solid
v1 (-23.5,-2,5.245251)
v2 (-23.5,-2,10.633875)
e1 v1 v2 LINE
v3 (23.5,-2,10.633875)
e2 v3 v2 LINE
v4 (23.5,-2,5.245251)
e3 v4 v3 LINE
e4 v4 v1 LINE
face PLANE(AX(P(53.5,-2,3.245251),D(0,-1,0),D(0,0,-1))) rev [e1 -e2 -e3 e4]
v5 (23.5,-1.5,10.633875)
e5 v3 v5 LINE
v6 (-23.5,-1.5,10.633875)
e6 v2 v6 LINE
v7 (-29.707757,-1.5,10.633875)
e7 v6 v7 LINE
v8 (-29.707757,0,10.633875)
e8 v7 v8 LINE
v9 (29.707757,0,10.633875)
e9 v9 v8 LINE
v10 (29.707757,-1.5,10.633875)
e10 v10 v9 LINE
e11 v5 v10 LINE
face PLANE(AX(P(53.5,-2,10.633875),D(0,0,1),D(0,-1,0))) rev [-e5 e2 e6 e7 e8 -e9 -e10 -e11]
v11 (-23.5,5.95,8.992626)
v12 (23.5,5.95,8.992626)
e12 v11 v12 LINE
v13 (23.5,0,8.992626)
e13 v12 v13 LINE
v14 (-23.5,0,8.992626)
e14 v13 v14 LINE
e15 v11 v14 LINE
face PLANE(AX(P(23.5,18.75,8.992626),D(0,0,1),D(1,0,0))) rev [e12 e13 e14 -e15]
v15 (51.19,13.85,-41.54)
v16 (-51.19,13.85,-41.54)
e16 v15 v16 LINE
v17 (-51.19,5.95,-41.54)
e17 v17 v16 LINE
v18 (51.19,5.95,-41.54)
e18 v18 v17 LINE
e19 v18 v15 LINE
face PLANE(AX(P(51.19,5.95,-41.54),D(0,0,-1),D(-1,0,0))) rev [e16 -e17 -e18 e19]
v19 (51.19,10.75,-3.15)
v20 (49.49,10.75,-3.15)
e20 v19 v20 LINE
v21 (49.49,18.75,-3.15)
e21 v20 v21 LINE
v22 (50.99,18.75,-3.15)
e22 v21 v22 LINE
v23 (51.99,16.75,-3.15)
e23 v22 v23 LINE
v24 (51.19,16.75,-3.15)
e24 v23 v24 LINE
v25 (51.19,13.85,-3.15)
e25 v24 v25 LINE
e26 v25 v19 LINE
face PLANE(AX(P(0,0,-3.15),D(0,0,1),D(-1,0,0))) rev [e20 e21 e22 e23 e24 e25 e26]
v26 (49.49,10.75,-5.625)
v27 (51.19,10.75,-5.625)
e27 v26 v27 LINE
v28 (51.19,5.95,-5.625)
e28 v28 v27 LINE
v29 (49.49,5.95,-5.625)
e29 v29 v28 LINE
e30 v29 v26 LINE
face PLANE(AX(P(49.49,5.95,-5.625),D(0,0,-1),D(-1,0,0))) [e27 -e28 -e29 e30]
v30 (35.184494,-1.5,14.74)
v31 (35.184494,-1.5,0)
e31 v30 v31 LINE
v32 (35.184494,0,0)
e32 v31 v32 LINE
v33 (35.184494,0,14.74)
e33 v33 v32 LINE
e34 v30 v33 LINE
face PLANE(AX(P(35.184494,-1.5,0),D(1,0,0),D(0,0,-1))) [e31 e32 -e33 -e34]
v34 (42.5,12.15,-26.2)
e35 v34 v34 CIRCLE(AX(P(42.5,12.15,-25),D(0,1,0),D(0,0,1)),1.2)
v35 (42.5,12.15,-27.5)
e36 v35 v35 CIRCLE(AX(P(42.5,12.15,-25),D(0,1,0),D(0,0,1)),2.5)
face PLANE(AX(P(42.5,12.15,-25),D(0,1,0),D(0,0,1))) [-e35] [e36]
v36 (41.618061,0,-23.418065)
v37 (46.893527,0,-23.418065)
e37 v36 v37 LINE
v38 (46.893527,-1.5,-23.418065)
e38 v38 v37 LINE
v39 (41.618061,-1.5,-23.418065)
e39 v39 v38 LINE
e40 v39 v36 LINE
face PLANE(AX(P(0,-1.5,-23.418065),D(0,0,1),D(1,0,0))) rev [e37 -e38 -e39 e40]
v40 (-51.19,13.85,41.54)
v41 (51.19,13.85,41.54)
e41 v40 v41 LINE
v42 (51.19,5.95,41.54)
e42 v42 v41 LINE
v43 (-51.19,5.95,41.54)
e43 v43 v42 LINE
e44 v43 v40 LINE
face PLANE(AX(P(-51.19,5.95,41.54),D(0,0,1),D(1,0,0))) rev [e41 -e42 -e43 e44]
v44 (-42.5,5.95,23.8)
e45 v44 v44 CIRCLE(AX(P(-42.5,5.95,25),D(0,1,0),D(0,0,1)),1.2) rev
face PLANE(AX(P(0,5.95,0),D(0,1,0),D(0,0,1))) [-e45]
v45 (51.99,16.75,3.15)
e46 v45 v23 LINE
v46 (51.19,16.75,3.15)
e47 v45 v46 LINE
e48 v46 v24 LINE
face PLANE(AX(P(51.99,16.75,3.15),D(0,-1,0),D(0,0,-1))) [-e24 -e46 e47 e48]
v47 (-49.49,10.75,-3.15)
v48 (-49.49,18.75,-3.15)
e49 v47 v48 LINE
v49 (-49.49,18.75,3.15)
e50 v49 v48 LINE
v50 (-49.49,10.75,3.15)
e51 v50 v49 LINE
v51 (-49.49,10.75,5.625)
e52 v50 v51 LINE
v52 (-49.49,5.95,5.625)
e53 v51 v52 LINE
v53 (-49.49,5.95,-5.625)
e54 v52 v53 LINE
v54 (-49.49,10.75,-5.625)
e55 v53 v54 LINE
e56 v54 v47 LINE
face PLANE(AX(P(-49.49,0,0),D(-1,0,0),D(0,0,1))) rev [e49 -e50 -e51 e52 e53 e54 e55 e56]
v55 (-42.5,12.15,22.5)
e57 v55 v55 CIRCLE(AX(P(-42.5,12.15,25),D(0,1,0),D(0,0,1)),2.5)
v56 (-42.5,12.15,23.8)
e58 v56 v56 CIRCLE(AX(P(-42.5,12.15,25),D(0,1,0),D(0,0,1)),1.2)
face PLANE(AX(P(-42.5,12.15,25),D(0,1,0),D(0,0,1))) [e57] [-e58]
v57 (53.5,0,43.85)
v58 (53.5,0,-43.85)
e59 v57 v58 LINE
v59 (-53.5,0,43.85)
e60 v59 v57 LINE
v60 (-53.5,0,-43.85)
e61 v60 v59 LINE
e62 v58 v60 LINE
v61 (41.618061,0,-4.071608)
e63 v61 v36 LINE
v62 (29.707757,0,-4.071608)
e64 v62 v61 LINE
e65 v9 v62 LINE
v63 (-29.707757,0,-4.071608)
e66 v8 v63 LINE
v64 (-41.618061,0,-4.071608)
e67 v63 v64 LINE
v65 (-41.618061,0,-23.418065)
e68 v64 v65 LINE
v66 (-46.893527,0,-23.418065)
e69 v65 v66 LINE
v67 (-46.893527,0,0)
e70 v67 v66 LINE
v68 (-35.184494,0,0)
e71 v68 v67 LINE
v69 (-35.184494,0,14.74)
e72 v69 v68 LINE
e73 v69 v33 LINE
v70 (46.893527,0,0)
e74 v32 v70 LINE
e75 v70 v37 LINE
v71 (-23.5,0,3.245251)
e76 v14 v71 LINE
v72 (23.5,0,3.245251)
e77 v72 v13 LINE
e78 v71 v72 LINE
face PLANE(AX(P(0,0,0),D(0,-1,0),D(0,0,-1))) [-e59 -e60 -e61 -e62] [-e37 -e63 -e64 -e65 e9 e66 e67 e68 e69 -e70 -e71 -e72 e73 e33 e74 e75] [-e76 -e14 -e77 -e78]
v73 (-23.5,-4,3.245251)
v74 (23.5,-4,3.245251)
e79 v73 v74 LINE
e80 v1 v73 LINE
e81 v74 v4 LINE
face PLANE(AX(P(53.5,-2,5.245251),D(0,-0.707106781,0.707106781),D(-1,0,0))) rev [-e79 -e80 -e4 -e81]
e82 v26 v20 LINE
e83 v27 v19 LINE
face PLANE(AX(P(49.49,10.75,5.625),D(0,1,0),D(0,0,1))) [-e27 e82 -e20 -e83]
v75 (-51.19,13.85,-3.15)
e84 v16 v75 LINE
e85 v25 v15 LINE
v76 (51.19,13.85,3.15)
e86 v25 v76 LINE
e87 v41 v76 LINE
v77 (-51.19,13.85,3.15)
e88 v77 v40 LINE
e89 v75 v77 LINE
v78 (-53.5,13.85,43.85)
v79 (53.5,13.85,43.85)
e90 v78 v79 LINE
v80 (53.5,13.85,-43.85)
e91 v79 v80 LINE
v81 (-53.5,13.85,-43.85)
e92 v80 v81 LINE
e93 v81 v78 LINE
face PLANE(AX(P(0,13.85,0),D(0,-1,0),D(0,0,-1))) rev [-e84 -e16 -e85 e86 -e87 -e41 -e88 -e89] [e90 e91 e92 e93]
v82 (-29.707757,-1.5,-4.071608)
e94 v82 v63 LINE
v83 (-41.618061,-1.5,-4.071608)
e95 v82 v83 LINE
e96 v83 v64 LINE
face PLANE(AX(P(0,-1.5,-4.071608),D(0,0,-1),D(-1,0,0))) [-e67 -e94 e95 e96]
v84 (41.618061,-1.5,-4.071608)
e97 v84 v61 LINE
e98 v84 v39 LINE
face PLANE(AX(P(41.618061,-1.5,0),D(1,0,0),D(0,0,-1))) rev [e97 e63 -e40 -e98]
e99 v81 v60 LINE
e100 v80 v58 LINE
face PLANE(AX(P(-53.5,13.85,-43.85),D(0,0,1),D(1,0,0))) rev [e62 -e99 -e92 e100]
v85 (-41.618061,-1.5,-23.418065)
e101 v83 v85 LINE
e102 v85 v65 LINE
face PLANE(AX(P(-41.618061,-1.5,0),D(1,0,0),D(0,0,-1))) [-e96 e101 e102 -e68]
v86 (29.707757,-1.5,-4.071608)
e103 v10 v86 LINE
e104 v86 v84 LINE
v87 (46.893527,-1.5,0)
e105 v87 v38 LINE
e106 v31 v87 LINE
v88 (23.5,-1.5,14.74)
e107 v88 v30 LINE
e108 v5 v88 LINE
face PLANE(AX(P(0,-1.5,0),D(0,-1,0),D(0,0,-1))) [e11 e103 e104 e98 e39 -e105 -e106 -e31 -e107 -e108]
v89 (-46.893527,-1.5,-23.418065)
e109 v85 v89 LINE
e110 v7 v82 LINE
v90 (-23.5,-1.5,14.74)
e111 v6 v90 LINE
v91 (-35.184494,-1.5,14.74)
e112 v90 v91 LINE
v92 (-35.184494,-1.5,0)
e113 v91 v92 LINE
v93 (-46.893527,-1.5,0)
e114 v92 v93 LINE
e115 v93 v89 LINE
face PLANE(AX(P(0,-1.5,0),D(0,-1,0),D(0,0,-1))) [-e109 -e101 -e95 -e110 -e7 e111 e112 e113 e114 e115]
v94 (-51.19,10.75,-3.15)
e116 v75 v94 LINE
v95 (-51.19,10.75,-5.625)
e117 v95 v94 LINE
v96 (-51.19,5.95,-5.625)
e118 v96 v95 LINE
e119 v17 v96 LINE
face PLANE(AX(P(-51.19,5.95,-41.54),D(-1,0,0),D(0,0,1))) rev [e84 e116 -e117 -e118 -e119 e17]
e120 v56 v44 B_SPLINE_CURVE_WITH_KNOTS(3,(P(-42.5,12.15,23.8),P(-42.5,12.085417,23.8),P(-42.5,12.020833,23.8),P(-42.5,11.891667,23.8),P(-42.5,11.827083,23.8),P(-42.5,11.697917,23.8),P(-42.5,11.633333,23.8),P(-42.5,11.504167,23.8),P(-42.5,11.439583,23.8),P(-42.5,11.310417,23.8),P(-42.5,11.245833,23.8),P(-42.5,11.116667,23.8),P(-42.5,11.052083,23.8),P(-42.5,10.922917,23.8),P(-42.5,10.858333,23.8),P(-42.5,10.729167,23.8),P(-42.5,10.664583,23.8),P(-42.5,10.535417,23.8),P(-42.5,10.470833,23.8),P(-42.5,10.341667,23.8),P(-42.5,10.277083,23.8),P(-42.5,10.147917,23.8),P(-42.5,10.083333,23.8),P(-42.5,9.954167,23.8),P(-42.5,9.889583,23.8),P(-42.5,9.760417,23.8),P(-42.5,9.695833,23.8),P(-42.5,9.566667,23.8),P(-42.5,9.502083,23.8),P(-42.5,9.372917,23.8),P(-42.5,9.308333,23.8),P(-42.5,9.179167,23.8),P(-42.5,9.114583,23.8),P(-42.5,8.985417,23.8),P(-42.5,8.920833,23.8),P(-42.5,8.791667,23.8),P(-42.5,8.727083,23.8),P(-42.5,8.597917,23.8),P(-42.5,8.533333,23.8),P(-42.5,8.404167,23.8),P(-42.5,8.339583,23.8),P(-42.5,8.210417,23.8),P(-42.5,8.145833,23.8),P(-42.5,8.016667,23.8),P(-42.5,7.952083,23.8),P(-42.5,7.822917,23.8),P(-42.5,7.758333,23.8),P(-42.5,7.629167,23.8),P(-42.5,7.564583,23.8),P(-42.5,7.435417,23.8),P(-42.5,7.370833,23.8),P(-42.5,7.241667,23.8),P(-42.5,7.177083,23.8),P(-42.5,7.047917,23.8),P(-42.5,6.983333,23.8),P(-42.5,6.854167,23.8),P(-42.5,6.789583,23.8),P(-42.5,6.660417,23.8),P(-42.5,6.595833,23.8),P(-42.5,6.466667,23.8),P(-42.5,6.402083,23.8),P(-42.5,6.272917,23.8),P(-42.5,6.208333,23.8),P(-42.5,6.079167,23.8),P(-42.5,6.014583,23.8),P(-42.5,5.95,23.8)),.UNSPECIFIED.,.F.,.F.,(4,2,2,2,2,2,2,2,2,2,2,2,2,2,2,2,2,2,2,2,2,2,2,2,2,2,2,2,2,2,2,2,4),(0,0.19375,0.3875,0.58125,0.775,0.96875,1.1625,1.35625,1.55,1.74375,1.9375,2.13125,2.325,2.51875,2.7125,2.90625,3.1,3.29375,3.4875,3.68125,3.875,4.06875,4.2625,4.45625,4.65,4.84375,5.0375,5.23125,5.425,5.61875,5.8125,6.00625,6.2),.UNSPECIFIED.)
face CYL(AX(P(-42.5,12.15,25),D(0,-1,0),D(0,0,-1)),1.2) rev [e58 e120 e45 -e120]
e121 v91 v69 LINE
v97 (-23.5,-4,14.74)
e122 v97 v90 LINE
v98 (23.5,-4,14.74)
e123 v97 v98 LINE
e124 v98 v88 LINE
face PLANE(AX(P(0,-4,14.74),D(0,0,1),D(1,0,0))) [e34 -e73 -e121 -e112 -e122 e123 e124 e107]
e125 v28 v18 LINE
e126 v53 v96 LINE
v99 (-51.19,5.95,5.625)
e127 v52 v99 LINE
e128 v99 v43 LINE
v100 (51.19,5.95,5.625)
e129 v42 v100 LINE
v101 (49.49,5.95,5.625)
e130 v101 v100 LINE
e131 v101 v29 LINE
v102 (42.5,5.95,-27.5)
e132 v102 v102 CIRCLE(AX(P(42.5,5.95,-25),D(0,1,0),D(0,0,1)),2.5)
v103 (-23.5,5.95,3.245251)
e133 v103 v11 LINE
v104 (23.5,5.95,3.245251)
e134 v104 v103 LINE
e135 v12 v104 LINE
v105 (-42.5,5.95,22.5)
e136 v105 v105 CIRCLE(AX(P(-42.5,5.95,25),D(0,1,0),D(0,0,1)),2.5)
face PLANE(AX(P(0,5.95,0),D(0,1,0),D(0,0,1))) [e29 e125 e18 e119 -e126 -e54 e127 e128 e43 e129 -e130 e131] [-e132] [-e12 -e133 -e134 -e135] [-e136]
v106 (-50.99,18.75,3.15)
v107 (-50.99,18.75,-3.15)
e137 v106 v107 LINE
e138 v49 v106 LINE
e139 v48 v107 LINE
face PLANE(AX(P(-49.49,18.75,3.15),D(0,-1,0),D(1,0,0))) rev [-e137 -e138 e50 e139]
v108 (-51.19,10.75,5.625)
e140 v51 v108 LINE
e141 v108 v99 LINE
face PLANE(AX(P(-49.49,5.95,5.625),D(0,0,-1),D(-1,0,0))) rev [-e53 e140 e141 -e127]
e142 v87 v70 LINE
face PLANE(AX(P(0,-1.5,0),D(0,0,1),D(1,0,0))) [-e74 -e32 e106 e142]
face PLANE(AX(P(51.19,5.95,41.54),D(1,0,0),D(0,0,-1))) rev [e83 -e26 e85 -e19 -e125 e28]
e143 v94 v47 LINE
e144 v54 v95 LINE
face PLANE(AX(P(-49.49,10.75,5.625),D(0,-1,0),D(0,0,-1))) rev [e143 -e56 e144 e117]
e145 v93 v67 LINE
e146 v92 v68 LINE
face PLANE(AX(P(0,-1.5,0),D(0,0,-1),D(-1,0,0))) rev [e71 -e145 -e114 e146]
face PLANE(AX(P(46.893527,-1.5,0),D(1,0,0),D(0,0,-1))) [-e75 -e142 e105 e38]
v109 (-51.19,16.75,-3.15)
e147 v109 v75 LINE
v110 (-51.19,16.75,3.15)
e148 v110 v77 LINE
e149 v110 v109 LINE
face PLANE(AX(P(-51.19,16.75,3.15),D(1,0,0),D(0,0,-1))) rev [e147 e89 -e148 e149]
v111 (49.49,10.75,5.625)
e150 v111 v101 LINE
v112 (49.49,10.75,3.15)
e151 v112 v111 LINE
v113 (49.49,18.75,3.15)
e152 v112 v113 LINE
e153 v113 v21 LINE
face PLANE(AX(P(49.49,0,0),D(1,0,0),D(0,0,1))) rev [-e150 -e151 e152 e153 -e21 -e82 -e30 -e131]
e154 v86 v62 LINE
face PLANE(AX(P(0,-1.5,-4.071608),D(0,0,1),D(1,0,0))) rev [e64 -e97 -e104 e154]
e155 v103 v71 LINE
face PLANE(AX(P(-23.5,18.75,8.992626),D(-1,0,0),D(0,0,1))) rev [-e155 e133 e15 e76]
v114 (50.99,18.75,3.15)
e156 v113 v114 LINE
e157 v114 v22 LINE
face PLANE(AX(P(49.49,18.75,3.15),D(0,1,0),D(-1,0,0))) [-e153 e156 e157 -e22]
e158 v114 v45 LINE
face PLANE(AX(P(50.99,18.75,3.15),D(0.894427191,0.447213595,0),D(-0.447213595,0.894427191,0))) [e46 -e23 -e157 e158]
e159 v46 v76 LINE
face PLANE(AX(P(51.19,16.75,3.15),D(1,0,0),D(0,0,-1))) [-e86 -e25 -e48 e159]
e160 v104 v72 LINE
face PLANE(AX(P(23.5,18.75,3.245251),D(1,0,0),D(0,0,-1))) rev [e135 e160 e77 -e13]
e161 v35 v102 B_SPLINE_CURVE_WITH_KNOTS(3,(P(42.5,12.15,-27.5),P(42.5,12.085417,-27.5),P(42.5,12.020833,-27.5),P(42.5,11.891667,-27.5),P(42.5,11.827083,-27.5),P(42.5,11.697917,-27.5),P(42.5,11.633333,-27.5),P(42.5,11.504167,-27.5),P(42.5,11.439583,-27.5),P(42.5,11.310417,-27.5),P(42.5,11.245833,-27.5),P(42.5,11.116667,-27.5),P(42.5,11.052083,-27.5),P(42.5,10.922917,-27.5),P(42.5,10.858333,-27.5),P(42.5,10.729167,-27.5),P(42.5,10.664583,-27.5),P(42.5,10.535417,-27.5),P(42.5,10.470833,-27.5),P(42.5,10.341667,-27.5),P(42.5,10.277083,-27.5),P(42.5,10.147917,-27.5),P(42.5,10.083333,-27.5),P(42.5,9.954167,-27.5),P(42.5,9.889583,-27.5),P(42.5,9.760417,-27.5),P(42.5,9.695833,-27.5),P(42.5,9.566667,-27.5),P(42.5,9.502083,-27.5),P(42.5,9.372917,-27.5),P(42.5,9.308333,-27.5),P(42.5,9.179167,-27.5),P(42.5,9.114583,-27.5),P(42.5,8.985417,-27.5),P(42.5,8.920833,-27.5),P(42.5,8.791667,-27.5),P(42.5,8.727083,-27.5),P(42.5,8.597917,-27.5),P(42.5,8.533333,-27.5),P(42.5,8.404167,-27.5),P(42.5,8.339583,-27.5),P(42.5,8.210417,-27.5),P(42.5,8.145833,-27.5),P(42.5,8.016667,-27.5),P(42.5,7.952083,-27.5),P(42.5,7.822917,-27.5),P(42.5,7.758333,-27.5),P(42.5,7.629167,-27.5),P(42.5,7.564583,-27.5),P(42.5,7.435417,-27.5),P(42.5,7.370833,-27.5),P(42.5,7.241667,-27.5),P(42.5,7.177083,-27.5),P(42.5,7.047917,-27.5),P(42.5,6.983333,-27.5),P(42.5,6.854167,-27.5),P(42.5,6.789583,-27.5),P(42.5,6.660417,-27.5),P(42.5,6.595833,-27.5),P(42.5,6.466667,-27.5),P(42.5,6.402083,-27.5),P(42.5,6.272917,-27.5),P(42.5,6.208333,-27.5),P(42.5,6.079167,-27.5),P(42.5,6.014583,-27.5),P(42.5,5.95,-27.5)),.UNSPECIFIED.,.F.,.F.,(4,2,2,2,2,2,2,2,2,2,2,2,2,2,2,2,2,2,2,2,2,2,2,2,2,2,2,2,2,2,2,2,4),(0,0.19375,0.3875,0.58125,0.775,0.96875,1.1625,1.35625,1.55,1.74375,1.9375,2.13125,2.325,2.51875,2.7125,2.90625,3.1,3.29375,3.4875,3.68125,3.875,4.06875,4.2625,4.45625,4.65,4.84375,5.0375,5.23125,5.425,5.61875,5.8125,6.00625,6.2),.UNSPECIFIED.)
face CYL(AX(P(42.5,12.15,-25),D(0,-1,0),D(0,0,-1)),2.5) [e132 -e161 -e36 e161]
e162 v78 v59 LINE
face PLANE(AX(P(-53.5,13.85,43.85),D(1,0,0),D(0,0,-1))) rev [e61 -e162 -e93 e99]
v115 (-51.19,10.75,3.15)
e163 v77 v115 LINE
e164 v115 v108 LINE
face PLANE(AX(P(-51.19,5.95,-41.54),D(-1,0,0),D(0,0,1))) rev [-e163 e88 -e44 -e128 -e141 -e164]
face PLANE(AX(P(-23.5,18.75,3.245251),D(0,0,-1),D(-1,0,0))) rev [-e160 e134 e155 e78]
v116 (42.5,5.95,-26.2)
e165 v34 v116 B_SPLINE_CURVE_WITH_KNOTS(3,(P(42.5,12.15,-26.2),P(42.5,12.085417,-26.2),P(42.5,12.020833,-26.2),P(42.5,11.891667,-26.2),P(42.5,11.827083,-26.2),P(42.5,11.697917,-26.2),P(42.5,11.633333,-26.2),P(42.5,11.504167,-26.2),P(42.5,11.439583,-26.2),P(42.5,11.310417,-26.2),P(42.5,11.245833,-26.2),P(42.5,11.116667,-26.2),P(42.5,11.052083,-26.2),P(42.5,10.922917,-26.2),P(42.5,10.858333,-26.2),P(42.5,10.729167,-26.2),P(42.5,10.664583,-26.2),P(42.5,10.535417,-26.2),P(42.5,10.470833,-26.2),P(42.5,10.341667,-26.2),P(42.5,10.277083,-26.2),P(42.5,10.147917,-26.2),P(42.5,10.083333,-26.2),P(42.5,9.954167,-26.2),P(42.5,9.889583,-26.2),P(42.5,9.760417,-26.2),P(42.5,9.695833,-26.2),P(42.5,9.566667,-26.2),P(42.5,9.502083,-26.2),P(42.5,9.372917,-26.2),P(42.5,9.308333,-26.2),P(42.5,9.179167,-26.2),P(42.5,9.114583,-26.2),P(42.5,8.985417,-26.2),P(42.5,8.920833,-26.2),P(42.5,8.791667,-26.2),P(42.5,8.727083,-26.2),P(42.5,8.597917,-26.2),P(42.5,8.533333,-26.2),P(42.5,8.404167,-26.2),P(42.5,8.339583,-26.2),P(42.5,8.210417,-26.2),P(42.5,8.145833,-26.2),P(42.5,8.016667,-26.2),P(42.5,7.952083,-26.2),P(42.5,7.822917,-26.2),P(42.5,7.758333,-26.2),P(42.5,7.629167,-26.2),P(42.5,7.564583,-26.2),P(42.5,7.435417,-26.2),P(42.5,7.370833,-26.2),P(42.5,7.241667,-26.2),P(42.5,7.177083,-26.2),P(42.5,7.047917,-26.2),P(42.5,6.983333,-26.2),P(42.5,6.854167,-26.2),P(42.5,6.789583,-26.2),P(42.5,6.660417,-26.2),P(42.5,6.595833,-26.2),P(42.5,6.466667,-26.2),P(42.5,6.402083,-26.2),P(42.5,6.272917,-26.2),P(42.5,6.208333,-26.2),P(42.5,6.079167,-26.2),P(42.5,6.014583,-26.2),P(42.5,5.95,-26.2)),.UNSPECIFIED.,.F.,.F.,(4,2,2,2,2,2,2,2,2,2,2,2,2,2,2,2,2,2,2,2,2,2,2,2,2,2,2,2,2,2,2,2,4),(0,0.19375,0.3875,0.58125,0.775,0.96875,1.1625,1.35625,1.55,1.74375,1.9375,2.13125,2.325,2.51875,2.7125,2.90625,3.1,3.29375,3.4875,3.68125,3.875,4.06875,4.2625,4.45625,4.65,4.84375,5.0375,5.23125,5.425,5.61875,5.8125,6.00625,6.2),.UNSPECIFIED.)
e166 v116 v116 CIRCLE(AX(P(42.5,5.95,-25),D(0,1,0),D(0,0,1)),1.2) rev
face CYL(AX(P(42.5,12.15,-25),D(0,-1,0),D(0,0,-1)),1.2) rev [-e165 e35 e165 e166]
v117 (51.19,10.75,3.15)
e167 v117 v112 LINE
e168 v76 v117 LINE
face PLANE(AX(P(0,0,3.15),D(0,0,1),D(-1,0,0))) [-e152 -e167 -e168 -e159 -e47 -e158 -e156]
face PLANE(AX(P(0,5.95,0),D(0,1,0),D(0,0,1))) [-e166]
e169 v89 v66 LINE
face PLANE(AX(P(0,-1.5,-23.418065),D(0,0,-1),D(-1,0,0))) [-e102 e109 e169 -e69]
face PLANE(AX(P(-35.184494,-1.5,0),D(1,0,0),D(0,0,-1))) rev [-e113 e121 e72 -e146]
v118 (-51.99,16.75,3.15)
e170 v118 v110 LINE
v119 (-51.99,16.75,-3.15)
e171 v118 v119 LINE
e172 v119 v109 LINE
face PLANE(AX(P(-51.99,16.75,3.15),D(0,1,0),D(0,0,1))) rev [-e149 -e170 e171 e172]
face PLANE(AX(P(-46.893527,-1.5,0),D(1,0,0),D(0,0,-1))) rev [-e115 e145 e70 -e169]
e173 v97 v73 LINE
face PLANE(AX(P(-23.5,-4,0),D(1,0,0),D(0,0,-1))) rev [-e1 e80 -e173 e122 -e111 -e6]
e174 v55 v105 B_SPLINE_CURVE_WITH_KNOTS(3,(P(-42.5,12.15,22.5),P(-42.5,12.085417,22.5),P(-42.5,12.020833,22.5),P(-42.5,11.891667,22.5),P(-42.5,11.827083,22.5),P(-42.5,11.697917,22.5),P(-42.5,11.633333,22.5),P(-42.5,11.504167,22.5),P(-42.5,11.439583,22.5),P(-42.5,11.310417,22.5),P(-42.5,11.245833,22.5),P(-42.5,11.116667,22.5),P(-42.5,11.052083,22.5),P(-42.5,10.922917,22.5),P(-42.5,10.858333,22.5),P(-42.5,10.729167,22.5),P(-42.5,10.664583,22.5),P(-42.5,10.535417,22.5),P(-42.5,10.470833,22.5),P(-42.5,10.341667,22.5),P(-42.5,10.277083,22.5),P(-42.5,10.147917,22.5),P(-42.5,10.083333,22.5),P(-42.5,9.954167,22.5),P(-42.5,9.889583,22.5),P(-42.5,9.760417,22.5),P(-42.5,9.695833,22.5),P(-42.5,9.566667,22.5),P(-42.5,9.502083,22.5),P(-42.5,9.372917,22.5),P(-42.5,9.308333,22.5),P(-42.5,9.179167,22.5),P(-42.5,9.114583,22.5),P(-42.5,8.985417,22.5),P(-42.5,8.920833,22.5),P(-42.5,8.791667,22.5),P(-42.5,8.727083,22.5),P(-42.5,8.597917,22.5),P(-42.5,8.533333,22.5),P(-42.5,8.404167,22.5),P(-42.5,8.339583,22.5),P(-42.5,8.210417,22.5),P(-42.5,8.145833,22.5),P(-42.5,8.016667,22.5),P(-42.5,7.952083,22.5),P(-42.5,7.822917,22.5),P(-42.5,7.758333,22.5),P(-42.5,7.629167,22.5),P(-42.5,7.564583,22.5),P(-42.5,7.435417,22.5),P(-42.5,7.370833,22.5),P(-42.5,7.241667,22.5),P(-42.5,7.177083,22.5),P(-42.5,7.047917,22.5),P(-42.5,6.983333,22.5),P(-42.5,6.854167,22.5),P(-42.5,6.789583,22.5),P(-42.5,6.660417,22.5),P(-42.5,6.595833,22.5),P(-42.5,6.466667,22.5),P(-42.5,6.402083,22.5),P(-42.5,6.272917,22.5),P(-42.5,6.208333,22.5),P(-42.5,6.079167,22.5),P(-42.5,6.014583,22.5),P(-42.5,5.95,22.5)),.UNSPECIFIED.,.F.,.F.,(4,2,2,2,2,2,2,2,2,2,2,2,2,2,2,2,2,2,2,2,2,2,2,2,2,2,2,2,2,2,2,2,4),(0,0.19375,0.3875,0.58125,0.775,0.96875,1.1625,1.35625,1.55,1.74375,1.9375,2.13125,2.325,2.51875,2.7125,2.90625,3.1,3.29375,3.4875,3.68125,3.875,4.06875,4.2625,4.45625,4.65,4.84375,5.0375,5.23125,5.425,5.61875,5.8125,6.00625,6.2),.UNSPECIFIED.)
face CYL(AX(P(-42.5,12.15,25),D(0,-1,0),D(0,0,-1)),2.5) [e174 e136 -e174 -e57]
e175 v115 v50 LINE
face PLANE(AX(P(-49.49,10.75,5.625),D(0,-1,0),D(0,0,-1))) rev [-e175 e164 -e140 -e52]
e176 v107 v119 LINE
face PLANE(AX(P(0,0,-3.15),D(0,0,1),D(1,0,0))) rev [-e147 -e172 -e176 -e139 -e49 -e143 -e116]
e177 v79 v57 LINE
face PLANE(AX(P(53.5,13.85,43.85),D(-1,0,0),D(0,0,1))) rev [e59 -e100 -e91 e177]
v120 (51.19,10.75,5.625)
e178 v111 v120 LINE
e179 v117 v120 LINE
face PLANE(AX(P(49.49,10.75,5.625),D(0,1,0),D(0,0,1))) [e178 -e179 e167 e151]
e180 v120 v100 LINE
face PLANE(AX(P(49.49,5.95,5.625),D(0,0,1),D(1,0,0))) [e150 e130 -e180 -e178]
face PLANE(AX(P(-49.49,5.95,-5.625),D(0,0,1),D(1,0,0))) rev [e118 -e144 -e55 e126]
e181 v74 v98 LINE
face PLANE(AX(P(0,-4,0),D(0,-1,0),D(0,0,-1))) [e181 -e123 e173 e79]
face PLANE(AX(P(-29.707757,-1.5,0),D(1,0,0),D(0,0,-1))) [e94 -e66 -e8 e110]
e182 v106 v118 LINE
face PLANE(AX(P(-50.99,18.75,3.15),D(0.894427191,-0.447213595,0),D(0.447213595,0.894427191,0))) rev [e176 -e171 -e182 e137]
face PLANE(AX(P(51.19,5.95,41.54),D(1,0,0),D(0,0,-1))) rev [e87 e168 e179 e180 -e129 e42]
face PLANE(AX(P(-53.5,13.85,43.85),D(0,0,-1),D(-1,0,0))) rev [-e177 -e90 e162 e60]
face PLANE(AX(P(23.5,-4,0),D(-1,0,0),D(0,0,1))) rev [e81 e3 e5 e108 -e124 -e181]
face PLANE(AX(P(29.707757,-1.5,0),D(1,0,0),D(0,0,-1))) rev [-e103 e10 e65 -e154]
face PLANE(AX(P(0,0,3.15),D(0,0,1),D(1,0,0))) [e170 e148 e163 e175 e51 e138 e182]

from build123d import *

# Parameters (mm, degrees)
SKETCH1_W           = 107
SKETCH1_H           = 87.7
BOSS_EXTRUDE1_DEPTH = 13.85
SKETCH2_W           = 102.38
SKETCH2_H           = 83.08
CUT_EXTRUDE1_DEPTH  = 7.9
SKETCH4_R           = 2.5
SKETCH4_R_2         = 1.2
BOSS_EXTRUDE2_DEPTH = 6.2
SKETCH7_W           = 11.25
SKETCH7_H           = 4.8
BOSS_EXTRUDE3_DEPTH = 1.7
BOSS_EXTRUDE4_DEPTH = 3.15
SKETCH3_W           = 23.5
SKETCH3_H           = 11.494748732
BOSS_EXTRUDE5_DEPTH = 4
SKETCH9_W           = 7.388623973
SKETCH9_H           = 2
CUT_EXTRUDE2_DEPTH  = 91.572539989
SKETCH10_W          = 47
SKETCH10_H          = 5.747374366
CUT_EXTRUDE4_DEPTH  = 72.670321612
CHAMFER1_SIZE       = 2
BOSS_EXTRUDE7_DEPTH = 1.5


with BuildPart() as part:
    # Sketch1 → Boss-Extrude1 (new body)
    with BuildSketch(Plane(origin=(0, 0, 0), x_dir=(1, 0, 0), z_dir=(0, 1, 0))):
        Rectangle(SKETCH1_W, SKETCH1_H)
    extrude(amount=BOSS_EXTRUDE1_DEPTH)

    # Sketch2 → Cut-Extrude1 (cut)
    with BuildSketch(Plane(origin=(0, 13.85, 0), x_dir=(1, 0, 0), z_dir=(0, 1, 0))):
        Rectangle(SKETCH2_W, SKETCH2_H)
    extrude(amount=-CUT_EXTRUDE1_DEPTH, mode=Mode.SUBTRACT)

    # Sketch4 → Boss-Extrude2 (add)
    # profile 1 of 2: a face of its own
    with BuildSketch(Plane(origin=(0, 5.95, 0), x_dir=(1, 0, 0), z_dir=(0, 1, 0))):
        with Locations(Location((-42.5, -25, 0), (0, 0, 90))):
            Circle(SKETCH4_R)
        with Locations(Location((-42.5, -25, 0), (0, 0, 90))):
            Circle(SKETCH4_R_2, mode=Mode.SUBTRACT)
    # profile 2 of 2: a face of its own
    with BuildSketch(Plane(origin=(0, 5.95, 0), x_dir=(1, 0, 0), z_dir=(0, 1, 0))):
        with Locations(Location((42.5, 25, 0), (0, 0, 90))):
            Circle(SKETCH4_R)
        with Locations(Location((42.5, 25, 0), (0, 0, 90))):
            Circle(SKETCH4_R_2, mode=Mode.SUBTRACT)
    extrude(amount=BOSS_EXTRUDE2_DEPTH)

    # Sketch7 → Boss-Extrude3 (add)
    with BuildSketch(Plane(origin=(-51.19, 0, 0), x_dir=(0, 0, -1), z_dir=(1, 0, 0))):
        with Locations((0, 8.35)):
            Rectangle(SKETCH7_W, SKETCH7_H)
    boss_extrude3 = extrude(amount=BOSS_EXTRUDE3_DEPTH)

    # Sketch8 → Boss-Extrude4 (add, symmetric)
    with BuildSketch(Plane.XY):
        Polygon((-49.49, 10.75), (-49.49, 18.75), (-50.99, 18.75), (-51.99, 16.75), (-51.19, 16.75), (-51.19, 10.75), align=None)
    boss_extrude4 = extrude(amount=BOSS_EXTRUDE4_DEPTH, both=True)

    # Sketch3 → Boss-Extrude5 (add)
    with BuildSketch(Plane.XZ):
        with Locations((-11.75, 8.992625634)):
            Rectangle(SKETCH3_W, SKETCH3_H)
        with Locations((11.75, 8.992625634)):
            Rectangle(SKETCH3_W, SKETCH3_H)
    extrude(amount=BOSS_EXTRUDE5_DEPTH)

    # Sketch9 → Cut-Extrude2 (cut, through all)
    with BuildSketch(Plane.ZY.offset(23.5)):
        with Locations((6.939563255, -1)):
            Rectangle(SKETCH9_W, SKETCH9_H)
    extrude(amount=-CUT_EXTRUDE2_DEPTH, mode=Mode.SUBTRACT)

    # Sketch10 → Cut-Extrude4 (cut, through all)
    with BuildSketch(Plane.XZ):
        with Locations((0, 6.118938451)):
            Rectangle(SKETCH10_W, SKETCH10_H)
    extrude(amount=-CUT_EXTRUDE4_DEPTH, mode=Mode.SUBTRACT)

    # Chamfer1
    chamfer1_edges = [part.edges().sort_by_distance(p)[0] for p in [
        (0, -2, 3.245251268),
    ]]
    chamfer(chamfer1_edges, length=CHAMFER1_SIZE - 0.0001)  # a hair under: the kernel refuses the full size

    # Mirror1: Boss-Extrude3, Boss-Extrude4 across plane
    add(boss_extrude3.mirror(Plane(origin=(0, 0, 0), x_dir=(0, 0, 1), z_dir=(1, 0, 0))))
    add(boss_extrude4.mirror(Plane(origin=(0, 0, 0), x_dir=(0, 0, 1), z_dir=(1, 0, 0))))

    # Sketch14 → Boss-Extrude7 (add)
    with BuildSketch(Plane.XZ):
        Polygon((-41.618061396, -23.418064695), (-46.893526608, -23.418064695), (-46.893526608, 0), (-35.18449426, 0), (-35.18449426, 14.74), (-23.5, 14.74), (-23.5, 10.633875241), (-29.707757231, 10.633875241), (-29.707757231, -4.071607842), (-41.618061396, -4.071607842), align=None)
    boss_extrude7 = extrude(amount=BOSS_EXTRUDE7_DEPTH)

    # Mirror2: Boss-Extrude7 across plane
    add(boss_extrude7.mirror(Plane(origin=(0, 0, 0), x_dir=(0, 0, 1), z_dir=(1, 0, 0))))


solid = part.part
